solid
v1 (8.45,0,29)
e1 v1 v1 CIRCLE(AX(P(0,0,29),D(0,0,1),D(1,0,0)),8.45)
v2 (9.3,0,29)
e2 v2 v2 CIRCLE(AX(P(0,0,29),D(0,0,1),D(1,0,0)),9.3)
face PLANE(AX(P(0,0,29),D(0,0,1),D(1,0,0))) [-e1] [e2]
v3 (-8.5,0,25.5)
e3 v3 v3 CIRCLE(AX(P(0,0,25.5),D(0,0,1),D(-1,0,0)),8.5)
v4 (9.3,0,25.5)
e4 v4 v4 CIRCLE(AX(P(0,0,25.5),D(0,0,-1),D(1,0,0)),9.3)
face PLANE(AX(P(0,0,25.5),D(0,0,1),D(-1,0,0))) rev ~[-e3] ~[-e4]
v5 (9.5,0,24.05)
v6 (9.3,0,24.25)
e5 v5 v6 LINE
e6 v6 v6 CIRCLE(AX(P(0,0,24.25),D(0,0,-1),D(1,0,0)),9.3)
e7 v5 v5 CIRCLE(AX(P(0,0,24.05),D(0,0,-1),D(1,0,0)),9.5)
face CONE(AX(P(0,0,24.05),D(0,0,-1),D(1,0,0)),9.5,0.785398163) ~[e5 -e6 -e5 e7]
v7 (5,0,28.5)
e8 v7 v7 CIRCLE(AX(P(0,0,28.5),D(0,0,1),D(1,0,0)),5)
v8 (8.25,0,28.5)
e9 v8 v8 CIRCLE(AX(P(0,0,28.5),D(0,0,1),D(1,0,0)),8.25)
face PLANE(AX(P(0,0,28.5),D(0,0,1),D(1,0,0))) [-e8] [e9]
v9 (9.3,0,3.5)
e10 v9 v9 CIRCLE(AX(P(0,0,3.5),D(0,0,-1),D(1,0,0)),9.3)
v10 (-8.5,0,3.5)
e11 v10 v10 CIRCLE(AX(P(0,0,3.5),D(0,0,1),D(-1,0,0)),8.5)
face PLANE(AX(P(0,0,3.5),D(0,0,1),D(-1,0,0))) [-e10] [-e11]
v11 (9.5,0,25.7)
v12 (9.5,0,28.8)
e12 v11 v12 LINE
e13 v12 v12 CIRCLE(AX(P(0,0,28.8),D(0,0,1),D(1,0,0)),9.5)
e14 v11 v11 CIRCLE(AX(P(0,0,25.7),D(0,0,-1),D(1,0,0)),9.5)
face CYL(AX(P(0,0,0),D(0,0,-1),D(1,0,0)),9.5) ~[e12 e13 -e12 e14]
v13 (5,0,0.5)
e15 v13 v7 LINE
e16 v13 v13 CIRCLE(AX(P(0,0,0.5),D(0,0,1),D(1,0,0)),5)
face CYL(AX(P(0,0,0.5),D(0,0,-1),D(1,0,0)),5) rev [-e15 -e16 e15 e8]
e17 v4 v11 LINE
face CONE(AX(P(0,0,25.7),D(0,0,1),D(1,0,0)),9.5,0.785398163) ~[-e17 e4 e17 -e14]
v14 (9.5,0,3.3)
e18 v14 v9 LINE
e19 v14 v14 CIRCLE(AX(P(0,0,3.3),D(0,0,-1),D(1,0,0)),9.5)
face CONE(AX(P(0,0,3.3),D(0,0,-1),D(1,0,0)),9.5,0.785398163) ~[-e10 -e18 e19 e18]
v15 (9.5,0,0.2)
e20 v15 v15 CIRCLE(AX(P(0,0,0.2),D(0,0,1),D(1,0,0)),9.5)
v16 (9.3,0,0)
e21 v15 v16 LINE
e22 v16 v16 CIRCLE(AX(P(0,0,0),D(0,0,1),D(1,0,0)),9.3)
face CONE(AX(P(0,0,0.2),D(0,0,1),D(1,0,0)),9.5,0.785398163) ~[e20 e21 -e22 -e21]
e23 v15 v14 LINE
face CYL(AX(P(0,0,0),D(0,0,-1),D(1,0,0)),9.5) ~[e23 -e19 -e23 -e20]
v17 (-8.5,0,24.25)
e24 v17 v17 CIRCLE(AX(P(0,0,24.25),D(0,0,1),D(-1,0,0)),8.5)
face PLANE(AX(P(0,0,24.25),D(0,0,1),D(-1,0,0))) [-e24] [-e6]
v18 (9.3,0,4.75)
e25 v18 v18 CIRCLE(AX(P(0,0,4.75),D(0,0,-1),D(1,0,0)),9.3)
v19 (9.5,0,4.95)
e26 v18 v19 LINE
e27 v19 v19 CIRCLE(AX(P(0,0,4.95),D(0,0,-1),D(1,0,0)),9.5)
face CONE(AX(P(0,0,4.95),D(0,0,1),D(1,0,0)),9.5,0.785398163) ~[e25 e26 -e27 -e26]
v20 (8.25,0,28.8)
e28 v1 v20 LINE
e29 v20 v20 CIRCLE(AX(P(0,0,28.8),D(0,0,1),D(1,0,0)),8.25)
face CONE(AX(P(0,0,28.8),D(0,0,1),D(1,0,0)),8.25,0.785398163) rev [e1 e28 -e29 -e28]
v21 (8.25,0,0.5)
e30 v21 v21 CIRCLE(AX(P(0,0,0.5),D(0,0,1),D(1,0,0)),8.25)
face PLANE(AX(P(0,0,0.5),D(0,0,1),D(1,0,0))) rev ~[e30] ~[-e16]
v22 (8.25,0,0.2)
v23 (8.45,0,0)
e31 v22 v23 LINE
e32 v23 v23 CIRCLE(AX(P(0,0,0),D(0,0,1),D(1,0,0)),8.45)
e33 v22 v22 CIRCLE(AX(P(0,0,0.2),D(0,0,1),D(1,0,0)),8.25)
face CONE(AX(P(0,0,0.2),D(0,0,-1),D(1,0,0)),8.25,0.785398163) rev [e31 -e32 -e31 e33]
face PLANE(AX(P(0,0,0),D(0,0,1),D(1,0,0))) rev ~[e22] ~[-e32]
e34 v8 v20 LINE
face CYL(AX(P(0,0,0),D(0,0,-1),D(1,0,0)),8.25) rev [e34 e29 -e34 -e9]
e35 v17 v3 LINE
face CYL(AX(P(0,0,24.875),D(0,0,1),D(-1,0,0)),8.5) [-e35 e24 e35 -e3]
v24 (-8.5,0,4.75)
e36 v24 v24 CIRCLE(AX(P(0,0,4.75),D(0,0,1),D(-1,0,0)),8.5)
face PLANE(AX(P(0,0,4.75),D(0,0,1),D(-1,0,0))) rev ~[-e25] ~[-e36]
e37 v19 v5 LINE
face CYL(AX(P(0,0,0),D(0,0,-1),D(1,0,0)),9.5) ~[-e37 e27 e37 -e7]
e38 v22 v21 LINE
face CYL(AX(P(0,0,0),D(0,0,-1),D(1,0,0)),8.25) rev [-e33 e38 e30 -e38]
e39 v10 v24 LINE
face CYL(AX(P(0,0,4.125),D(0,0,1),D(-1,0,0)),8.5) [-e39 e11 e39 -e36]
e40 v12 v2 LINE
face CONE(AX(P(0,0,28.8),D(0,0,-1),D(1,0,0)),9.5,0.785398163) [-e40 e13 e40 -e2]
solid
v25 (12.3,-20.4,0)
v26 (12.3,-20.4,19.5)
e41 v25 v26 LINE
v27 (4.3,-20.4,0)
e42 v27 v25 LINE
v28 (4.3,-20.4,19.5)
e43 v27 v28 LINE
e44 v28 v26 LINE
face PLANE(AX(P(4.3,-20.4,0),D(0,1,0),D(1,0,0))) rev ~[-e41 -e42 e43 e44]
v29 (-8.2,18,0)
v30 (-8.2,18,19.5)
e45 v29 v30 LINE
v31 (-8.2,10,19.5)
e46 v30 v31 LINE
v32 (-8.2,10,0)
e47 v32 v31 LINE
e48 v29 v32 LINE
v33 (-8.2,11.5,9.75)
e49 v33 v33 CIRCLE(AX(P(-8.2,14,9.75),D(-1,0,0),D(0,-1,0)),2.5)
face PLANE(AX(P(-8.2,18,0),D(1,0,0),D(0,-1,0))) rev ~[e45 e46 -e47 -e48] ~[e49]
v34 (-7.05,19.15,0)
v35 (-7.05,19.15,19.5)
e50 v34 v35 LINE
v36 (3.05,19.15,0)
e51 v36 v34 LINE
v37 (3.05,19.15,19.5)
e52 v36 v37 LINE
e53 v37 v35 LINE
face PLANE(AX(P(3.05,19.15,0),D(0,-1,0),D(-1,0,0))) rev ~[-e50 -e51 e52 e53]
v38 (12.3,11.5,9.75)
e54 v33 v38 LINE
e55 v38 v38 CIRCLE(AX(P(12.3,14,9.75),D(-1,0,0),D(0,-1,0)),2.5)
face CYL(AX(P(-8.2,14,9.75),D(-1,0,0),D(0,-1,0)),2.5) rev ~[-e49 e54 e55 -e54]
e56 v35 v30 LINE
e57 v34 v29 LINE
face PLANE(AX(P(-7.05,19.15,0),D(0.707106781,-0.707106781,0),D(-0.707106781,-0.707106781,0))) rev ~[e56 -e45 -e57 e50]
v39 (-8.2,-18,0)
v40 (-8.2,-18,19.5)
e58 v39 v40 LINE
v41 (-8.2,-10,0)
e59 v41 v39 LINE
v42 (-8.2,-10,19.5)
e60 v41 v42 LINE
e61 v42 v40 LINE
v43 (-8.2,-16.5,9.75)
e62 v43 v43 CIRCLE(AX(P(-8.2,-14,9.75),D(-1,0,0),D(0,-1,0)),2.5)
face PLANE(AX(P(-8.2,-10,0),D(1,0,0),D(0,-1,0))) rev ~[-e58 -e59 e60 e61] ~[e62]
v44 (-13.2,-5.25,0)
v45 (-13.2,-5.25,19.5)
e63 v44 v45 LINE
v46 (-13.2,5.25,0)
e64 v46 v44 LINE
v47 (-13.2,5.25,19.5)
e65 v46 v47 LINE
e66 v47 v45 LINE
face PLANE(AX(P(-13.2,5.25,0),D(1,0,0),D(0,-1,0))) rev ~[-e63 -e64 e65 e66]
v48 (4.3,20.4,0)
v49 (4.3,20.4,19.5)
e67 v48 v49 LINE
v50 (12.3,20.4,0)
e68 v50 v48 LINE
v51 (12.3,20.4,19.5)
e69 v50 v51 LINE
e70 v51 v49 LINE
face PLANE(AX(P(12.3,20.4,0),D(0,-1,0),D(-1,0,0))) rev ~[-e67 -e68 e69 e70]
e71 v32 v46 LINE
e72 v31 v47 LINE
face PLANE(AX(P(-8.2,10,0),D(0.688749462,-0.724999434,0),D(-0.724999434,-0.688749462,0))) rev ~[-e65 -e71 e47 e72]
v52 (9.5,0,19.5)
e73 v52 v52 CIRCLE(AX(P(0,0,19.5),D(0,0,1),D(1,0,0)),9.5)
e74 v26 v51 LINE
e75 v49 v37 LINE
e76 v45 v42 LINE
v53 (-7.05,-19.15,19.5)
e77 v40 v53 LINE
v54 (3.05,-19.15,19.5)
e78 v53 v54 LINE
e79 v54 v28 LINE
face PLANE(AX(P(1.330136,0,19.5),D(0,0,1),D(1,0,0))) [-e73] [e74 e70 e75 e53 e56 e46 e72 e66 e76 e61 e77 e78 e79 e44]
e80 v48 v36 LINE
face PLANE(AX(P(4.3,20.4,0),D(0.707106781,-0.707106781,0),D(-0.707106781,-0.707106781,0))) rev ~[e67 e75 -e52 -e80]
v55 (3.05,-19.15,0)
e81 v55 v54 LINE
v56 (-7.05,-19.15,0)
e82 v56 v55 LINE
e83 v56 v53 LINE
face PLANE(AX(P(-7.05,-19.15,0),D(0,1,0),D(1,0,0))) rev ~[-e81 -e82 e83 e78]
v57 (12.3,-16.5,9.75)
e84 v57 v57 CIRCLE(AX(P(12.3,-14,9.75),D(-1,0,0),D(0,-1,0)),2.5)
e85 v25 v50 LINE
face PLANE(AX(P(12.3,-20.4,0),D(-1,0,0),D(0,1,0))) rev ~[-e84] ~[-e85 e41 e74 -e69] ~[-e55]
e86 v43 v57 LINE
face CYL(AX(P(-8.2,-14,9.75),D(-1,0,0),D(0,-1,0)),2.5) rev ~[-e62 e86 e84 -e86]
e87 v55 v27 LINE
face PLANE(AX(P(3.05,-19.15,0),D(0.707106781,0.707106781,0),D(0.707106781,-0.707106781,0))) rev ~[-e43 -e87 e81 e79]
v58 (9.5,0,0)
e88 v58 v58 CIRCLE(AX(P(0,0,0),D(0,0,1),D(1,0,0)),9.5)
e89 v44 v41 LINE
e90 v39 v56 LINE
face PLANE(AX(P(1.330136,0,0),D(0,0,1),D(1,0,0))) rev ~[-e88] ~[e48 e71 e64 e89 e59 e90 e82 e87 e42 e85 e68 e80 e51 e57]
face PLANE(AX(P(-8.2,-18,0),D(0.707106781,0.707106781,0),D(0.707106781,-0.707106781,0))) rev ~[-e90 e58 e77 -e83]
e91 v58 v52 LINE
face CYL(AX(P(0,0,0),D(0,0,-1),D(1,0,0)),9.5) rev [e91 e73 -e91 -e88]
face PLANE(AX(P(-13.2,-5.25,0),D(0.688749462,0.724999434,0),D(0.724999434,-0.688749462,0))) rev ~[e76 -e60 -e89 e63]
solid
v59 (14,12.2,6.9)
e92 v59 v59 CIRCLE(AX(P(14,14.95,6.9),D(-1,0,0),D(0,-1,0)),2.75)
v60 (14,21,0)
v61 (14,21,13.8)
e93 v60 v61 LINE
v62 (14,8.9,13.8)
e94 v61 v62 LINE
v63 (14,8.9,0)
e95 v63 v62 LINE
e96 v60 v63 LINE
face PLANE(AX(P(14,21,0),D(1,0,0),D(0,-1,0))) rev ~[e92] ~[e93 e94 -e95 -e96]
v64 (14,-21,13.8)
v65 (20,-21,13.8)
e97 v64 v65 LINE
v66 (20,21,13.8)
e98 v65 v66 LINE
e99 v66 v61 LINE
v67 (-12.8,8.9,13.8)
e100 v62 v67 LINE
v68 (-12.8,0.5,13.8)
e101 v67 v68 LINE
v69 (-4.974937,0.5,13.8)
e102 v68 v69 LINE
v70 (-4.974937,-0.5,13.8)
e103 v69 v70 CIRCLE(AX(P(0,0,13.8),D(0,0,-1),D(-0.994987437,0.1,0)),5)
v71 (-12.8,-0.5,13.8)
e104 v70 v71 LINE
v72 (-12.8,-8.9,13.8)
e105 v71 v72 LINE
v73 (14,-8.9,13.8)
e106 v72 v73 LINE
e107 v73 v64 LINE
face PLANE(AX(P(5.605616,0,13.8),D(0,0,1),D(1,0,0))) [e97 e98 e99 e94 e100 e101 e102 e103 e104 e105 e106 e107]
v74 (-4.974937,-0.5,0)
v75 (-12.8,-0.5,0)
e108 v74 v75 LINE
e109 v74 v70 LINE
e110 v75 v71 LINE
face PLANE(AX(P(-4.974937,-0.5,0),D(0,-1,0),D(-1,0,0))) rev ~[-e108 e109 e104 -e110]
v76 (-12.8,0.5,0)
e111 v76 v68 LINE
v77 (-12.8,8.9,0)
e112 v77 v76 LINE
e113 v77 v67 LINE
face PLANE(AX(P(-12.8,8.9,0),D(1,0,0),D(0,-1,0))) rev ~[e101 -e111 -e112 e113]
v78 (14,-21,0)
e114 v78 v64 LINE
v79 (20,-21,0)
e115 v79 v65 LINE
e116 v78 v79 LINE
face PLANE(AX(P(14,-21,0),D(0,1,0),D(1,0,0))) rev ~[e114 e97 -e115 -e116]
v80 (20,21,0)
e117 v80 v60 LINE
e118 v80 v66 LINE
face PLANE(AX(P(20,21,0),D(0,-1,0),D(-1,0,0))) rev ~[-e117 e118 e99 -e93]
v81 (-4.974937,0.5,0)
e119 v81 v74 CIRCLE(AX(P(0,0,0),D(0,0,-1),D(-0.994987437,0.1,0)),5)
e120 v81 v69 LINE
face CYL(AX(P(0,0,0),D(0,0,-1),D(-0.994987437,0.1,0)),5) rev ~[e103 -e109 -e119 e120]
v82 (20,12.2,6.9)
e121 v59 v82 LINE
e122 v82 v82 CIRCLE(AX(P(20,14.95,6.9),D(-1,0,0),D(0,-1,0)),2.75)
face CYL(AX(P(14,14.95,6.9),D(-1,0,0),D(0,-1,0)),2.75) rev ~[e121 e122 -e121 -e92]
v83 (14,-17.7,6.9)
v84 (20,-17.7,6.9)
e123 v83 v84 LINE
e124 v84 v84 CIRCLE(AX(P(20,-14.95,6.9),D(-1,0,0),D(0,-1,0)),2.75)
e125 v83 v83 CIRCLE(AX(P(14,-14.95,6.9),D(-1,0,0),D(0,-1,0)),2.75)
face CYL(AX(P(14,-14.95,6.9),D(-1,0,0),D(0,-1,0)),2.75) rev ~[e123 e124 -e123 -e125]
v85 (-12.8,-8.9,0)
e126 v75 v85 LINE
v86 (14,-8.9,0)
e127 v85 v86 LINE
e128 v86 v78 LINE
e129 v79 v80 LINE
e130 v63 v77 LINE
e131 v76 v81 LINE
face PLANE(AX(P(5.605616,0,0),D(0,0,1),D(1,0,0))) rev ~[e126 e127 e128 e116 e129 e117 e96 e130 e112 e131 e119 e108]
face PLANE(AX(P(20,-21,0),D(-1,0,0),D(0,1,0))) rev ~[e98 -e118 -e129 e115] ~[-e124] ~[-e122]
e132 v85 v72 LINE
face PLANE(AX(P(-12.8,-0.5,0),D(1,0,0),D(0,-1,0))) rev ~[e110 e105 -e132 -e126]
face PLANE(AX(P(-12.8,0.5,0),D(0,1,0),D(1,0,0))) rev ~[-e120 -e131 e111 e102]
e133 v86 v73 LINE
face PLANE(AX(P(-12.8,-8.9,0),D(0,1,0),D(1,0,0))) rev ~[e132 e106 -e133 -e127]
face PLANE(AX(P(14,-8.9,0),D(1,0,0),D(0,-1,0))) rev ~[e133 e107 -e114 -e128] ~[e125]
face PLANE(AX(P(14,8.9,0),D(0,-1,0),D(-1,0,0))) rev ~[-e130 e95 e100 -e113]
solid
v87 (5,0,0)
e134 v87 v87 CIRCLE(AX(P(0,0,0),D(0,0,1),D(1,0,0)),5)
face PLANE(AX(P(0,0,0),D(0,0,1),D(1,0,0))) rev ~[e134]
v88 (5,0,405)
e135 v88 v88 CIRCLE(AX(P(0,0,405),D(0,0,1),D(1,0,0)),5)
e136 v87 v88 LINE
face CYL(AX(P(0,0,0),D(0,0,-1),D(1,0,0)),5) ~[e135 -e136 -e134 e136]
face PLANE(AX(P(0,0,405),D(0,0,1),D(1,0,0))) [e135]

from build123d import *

# Parameters (mm, degrees)
F1_DEPTH  = 13.8
F2_R      = 2.75
F3_DEPTH  = 6.001
F4_R      = 9.5
F5_DEPTH  = 19.5
F4_R_2    = 8.25
F6_DEPTH  = 29
F7_START  = 0.5
F4_R_3    = 5
F7_DEPTH  = 28
F8_W      = 1
F8_H      = 1.25
F10_SIZE  = 0.2
F11_R     = 2.5
F12_DEPTH = 28.201
F13_DEPTH = 405


with BuildPart() as f1:
    # F0 (on Top) → F1 (new body)
    with BuildSketch(Plane.XY):
        with BuildLine():
            Line((20, -21), (20, 21))
            Line((20, 21), (14, 21))
            Line((14, 21), (14, 8.9))
            Line((14, 8.9), (-12.8, 8.9))
            Line((-12.8, 8.9), (-12.8, 0.5))
            Line((-12.8, 0.5), (-4.9749371855, 0.5))
            ThreePointArc((-4.9749371855, 0.5), (5, 0), (-4.9749371855, -0.5))
            Line((-4.9749371855, -0.5), (-12.8, -0.5))
            Line((-12.8, -0.5), (-12.8, -8.9))
            Line((-12.8, -8.9), (14, -8.9))
            Line((14, -8.9), (14, -21))
            Line((14, -21), (20, -21))
        make_face()
    extrude(amount=F1_DEPTH)

    # F2 (on face) → F3 (cut, through all)
    with BuildSketch(Plane(origin=(14, 0, 0), x_dir=(0, -1, 0), z_dir=(-1, 0, 0))):
        with Locations((-14.95, 6.9)):
            Circle(F2_R)
        with Locations((14.95, 6.9)):
            Circle(F2_R)
    extrude(amount=-F3_DEPTH, mode=Mode.SUBTRACT)


with BuildPart() as f5:
    # F4 (on Top) → F5 (new body)
    with BuildSketch(Plane.XY):
        Polygon((12.3, -20.4), (12.3, 20.4), (4.3, 20.4), (3.05, 19.15), (-7.05, 19.15), (-8.2, 18), (-8.2, 10), (-13.2, 5.25), (-13.2, -5.25), (-8.2, -10), (-8.2, -18), (-7.05, -19.15), (3.05, -19.15), (4.3, -20.4), align=None)
        Circle(F4_R, mode=Mode.SUBTRACT)
    extrude(amount=F5_DEPTH)

    # F11 (on face) → F12 (cut, through all)
    with BuildSketch(Plane(origin=(-8.2, 0, 0), x_dir=(0, -1, 0), z_dir=(-1, 0, 0))):
        with Locations((14, 9.75)):
            Circle(F11_R)
        with Locations((-14, 9.75)):
            Circle(F11_R)
    extrude(amount=-F12_DEPTH, mode=Mode.SUBTRACT)


with BuildPart() as f6:
    # F4 (on Top) → F6 (new body)
    with BuildSketch(Plane.XY):
        Circle(F4_R)
        Circle(F4_R_2, mode=Mode.SUBTRACT)
    extrude(amount=F6_DEPTH)

    # F4 (on Top) → F7 (join)
    with BuildSketch(Plane.XY.offset(F7_START)):
        Circle(F4_R_2)
        Circle(F4_R_3, mode=Mode.SUBTRACT)
    extrude(amount=F7_DEPTH)

    # F8 (on Front) → F9 (revolve, cut)
    with BuildSketch(Plane.XZ):
        with Locations((-9, 24.875)):
            Rectangle(F8_W, F8_H)
        with Locations((-9, 4.125)):
            Rectangle(F8_W, F8_H)
    revolve(axis=Axis((0, 0, 7.25), (0, 0, 1)), mode=Mode.SUBTRACT)

    # F10
    f10_edges = [f6.edges().sort_by_distance(p)[0] for p in [
        (-9.5, 0, 29),
        (-8.25, 0, 29),
        (-9.5, 0, 24.25),
        (-9.5, 0, 25.5),
        (-9.5, 0, 3.5),
        (-9.5, 0, 4.75),
        (-9.5, 0, 0),
        (-8.25, 0, 0),
    ]]
    chamfer(f10_edges, length=F10_SIZE)


with BuildPart() as f13:
    # F4 (on Top) → F13 (new body)
    with BuildSketch(Plane.XY):
        Circle(F4_R_3)
    extrude(amount=F13_DEPTH)


solid = Compound([f1.part, f5.part, f6.part, f13.part])
